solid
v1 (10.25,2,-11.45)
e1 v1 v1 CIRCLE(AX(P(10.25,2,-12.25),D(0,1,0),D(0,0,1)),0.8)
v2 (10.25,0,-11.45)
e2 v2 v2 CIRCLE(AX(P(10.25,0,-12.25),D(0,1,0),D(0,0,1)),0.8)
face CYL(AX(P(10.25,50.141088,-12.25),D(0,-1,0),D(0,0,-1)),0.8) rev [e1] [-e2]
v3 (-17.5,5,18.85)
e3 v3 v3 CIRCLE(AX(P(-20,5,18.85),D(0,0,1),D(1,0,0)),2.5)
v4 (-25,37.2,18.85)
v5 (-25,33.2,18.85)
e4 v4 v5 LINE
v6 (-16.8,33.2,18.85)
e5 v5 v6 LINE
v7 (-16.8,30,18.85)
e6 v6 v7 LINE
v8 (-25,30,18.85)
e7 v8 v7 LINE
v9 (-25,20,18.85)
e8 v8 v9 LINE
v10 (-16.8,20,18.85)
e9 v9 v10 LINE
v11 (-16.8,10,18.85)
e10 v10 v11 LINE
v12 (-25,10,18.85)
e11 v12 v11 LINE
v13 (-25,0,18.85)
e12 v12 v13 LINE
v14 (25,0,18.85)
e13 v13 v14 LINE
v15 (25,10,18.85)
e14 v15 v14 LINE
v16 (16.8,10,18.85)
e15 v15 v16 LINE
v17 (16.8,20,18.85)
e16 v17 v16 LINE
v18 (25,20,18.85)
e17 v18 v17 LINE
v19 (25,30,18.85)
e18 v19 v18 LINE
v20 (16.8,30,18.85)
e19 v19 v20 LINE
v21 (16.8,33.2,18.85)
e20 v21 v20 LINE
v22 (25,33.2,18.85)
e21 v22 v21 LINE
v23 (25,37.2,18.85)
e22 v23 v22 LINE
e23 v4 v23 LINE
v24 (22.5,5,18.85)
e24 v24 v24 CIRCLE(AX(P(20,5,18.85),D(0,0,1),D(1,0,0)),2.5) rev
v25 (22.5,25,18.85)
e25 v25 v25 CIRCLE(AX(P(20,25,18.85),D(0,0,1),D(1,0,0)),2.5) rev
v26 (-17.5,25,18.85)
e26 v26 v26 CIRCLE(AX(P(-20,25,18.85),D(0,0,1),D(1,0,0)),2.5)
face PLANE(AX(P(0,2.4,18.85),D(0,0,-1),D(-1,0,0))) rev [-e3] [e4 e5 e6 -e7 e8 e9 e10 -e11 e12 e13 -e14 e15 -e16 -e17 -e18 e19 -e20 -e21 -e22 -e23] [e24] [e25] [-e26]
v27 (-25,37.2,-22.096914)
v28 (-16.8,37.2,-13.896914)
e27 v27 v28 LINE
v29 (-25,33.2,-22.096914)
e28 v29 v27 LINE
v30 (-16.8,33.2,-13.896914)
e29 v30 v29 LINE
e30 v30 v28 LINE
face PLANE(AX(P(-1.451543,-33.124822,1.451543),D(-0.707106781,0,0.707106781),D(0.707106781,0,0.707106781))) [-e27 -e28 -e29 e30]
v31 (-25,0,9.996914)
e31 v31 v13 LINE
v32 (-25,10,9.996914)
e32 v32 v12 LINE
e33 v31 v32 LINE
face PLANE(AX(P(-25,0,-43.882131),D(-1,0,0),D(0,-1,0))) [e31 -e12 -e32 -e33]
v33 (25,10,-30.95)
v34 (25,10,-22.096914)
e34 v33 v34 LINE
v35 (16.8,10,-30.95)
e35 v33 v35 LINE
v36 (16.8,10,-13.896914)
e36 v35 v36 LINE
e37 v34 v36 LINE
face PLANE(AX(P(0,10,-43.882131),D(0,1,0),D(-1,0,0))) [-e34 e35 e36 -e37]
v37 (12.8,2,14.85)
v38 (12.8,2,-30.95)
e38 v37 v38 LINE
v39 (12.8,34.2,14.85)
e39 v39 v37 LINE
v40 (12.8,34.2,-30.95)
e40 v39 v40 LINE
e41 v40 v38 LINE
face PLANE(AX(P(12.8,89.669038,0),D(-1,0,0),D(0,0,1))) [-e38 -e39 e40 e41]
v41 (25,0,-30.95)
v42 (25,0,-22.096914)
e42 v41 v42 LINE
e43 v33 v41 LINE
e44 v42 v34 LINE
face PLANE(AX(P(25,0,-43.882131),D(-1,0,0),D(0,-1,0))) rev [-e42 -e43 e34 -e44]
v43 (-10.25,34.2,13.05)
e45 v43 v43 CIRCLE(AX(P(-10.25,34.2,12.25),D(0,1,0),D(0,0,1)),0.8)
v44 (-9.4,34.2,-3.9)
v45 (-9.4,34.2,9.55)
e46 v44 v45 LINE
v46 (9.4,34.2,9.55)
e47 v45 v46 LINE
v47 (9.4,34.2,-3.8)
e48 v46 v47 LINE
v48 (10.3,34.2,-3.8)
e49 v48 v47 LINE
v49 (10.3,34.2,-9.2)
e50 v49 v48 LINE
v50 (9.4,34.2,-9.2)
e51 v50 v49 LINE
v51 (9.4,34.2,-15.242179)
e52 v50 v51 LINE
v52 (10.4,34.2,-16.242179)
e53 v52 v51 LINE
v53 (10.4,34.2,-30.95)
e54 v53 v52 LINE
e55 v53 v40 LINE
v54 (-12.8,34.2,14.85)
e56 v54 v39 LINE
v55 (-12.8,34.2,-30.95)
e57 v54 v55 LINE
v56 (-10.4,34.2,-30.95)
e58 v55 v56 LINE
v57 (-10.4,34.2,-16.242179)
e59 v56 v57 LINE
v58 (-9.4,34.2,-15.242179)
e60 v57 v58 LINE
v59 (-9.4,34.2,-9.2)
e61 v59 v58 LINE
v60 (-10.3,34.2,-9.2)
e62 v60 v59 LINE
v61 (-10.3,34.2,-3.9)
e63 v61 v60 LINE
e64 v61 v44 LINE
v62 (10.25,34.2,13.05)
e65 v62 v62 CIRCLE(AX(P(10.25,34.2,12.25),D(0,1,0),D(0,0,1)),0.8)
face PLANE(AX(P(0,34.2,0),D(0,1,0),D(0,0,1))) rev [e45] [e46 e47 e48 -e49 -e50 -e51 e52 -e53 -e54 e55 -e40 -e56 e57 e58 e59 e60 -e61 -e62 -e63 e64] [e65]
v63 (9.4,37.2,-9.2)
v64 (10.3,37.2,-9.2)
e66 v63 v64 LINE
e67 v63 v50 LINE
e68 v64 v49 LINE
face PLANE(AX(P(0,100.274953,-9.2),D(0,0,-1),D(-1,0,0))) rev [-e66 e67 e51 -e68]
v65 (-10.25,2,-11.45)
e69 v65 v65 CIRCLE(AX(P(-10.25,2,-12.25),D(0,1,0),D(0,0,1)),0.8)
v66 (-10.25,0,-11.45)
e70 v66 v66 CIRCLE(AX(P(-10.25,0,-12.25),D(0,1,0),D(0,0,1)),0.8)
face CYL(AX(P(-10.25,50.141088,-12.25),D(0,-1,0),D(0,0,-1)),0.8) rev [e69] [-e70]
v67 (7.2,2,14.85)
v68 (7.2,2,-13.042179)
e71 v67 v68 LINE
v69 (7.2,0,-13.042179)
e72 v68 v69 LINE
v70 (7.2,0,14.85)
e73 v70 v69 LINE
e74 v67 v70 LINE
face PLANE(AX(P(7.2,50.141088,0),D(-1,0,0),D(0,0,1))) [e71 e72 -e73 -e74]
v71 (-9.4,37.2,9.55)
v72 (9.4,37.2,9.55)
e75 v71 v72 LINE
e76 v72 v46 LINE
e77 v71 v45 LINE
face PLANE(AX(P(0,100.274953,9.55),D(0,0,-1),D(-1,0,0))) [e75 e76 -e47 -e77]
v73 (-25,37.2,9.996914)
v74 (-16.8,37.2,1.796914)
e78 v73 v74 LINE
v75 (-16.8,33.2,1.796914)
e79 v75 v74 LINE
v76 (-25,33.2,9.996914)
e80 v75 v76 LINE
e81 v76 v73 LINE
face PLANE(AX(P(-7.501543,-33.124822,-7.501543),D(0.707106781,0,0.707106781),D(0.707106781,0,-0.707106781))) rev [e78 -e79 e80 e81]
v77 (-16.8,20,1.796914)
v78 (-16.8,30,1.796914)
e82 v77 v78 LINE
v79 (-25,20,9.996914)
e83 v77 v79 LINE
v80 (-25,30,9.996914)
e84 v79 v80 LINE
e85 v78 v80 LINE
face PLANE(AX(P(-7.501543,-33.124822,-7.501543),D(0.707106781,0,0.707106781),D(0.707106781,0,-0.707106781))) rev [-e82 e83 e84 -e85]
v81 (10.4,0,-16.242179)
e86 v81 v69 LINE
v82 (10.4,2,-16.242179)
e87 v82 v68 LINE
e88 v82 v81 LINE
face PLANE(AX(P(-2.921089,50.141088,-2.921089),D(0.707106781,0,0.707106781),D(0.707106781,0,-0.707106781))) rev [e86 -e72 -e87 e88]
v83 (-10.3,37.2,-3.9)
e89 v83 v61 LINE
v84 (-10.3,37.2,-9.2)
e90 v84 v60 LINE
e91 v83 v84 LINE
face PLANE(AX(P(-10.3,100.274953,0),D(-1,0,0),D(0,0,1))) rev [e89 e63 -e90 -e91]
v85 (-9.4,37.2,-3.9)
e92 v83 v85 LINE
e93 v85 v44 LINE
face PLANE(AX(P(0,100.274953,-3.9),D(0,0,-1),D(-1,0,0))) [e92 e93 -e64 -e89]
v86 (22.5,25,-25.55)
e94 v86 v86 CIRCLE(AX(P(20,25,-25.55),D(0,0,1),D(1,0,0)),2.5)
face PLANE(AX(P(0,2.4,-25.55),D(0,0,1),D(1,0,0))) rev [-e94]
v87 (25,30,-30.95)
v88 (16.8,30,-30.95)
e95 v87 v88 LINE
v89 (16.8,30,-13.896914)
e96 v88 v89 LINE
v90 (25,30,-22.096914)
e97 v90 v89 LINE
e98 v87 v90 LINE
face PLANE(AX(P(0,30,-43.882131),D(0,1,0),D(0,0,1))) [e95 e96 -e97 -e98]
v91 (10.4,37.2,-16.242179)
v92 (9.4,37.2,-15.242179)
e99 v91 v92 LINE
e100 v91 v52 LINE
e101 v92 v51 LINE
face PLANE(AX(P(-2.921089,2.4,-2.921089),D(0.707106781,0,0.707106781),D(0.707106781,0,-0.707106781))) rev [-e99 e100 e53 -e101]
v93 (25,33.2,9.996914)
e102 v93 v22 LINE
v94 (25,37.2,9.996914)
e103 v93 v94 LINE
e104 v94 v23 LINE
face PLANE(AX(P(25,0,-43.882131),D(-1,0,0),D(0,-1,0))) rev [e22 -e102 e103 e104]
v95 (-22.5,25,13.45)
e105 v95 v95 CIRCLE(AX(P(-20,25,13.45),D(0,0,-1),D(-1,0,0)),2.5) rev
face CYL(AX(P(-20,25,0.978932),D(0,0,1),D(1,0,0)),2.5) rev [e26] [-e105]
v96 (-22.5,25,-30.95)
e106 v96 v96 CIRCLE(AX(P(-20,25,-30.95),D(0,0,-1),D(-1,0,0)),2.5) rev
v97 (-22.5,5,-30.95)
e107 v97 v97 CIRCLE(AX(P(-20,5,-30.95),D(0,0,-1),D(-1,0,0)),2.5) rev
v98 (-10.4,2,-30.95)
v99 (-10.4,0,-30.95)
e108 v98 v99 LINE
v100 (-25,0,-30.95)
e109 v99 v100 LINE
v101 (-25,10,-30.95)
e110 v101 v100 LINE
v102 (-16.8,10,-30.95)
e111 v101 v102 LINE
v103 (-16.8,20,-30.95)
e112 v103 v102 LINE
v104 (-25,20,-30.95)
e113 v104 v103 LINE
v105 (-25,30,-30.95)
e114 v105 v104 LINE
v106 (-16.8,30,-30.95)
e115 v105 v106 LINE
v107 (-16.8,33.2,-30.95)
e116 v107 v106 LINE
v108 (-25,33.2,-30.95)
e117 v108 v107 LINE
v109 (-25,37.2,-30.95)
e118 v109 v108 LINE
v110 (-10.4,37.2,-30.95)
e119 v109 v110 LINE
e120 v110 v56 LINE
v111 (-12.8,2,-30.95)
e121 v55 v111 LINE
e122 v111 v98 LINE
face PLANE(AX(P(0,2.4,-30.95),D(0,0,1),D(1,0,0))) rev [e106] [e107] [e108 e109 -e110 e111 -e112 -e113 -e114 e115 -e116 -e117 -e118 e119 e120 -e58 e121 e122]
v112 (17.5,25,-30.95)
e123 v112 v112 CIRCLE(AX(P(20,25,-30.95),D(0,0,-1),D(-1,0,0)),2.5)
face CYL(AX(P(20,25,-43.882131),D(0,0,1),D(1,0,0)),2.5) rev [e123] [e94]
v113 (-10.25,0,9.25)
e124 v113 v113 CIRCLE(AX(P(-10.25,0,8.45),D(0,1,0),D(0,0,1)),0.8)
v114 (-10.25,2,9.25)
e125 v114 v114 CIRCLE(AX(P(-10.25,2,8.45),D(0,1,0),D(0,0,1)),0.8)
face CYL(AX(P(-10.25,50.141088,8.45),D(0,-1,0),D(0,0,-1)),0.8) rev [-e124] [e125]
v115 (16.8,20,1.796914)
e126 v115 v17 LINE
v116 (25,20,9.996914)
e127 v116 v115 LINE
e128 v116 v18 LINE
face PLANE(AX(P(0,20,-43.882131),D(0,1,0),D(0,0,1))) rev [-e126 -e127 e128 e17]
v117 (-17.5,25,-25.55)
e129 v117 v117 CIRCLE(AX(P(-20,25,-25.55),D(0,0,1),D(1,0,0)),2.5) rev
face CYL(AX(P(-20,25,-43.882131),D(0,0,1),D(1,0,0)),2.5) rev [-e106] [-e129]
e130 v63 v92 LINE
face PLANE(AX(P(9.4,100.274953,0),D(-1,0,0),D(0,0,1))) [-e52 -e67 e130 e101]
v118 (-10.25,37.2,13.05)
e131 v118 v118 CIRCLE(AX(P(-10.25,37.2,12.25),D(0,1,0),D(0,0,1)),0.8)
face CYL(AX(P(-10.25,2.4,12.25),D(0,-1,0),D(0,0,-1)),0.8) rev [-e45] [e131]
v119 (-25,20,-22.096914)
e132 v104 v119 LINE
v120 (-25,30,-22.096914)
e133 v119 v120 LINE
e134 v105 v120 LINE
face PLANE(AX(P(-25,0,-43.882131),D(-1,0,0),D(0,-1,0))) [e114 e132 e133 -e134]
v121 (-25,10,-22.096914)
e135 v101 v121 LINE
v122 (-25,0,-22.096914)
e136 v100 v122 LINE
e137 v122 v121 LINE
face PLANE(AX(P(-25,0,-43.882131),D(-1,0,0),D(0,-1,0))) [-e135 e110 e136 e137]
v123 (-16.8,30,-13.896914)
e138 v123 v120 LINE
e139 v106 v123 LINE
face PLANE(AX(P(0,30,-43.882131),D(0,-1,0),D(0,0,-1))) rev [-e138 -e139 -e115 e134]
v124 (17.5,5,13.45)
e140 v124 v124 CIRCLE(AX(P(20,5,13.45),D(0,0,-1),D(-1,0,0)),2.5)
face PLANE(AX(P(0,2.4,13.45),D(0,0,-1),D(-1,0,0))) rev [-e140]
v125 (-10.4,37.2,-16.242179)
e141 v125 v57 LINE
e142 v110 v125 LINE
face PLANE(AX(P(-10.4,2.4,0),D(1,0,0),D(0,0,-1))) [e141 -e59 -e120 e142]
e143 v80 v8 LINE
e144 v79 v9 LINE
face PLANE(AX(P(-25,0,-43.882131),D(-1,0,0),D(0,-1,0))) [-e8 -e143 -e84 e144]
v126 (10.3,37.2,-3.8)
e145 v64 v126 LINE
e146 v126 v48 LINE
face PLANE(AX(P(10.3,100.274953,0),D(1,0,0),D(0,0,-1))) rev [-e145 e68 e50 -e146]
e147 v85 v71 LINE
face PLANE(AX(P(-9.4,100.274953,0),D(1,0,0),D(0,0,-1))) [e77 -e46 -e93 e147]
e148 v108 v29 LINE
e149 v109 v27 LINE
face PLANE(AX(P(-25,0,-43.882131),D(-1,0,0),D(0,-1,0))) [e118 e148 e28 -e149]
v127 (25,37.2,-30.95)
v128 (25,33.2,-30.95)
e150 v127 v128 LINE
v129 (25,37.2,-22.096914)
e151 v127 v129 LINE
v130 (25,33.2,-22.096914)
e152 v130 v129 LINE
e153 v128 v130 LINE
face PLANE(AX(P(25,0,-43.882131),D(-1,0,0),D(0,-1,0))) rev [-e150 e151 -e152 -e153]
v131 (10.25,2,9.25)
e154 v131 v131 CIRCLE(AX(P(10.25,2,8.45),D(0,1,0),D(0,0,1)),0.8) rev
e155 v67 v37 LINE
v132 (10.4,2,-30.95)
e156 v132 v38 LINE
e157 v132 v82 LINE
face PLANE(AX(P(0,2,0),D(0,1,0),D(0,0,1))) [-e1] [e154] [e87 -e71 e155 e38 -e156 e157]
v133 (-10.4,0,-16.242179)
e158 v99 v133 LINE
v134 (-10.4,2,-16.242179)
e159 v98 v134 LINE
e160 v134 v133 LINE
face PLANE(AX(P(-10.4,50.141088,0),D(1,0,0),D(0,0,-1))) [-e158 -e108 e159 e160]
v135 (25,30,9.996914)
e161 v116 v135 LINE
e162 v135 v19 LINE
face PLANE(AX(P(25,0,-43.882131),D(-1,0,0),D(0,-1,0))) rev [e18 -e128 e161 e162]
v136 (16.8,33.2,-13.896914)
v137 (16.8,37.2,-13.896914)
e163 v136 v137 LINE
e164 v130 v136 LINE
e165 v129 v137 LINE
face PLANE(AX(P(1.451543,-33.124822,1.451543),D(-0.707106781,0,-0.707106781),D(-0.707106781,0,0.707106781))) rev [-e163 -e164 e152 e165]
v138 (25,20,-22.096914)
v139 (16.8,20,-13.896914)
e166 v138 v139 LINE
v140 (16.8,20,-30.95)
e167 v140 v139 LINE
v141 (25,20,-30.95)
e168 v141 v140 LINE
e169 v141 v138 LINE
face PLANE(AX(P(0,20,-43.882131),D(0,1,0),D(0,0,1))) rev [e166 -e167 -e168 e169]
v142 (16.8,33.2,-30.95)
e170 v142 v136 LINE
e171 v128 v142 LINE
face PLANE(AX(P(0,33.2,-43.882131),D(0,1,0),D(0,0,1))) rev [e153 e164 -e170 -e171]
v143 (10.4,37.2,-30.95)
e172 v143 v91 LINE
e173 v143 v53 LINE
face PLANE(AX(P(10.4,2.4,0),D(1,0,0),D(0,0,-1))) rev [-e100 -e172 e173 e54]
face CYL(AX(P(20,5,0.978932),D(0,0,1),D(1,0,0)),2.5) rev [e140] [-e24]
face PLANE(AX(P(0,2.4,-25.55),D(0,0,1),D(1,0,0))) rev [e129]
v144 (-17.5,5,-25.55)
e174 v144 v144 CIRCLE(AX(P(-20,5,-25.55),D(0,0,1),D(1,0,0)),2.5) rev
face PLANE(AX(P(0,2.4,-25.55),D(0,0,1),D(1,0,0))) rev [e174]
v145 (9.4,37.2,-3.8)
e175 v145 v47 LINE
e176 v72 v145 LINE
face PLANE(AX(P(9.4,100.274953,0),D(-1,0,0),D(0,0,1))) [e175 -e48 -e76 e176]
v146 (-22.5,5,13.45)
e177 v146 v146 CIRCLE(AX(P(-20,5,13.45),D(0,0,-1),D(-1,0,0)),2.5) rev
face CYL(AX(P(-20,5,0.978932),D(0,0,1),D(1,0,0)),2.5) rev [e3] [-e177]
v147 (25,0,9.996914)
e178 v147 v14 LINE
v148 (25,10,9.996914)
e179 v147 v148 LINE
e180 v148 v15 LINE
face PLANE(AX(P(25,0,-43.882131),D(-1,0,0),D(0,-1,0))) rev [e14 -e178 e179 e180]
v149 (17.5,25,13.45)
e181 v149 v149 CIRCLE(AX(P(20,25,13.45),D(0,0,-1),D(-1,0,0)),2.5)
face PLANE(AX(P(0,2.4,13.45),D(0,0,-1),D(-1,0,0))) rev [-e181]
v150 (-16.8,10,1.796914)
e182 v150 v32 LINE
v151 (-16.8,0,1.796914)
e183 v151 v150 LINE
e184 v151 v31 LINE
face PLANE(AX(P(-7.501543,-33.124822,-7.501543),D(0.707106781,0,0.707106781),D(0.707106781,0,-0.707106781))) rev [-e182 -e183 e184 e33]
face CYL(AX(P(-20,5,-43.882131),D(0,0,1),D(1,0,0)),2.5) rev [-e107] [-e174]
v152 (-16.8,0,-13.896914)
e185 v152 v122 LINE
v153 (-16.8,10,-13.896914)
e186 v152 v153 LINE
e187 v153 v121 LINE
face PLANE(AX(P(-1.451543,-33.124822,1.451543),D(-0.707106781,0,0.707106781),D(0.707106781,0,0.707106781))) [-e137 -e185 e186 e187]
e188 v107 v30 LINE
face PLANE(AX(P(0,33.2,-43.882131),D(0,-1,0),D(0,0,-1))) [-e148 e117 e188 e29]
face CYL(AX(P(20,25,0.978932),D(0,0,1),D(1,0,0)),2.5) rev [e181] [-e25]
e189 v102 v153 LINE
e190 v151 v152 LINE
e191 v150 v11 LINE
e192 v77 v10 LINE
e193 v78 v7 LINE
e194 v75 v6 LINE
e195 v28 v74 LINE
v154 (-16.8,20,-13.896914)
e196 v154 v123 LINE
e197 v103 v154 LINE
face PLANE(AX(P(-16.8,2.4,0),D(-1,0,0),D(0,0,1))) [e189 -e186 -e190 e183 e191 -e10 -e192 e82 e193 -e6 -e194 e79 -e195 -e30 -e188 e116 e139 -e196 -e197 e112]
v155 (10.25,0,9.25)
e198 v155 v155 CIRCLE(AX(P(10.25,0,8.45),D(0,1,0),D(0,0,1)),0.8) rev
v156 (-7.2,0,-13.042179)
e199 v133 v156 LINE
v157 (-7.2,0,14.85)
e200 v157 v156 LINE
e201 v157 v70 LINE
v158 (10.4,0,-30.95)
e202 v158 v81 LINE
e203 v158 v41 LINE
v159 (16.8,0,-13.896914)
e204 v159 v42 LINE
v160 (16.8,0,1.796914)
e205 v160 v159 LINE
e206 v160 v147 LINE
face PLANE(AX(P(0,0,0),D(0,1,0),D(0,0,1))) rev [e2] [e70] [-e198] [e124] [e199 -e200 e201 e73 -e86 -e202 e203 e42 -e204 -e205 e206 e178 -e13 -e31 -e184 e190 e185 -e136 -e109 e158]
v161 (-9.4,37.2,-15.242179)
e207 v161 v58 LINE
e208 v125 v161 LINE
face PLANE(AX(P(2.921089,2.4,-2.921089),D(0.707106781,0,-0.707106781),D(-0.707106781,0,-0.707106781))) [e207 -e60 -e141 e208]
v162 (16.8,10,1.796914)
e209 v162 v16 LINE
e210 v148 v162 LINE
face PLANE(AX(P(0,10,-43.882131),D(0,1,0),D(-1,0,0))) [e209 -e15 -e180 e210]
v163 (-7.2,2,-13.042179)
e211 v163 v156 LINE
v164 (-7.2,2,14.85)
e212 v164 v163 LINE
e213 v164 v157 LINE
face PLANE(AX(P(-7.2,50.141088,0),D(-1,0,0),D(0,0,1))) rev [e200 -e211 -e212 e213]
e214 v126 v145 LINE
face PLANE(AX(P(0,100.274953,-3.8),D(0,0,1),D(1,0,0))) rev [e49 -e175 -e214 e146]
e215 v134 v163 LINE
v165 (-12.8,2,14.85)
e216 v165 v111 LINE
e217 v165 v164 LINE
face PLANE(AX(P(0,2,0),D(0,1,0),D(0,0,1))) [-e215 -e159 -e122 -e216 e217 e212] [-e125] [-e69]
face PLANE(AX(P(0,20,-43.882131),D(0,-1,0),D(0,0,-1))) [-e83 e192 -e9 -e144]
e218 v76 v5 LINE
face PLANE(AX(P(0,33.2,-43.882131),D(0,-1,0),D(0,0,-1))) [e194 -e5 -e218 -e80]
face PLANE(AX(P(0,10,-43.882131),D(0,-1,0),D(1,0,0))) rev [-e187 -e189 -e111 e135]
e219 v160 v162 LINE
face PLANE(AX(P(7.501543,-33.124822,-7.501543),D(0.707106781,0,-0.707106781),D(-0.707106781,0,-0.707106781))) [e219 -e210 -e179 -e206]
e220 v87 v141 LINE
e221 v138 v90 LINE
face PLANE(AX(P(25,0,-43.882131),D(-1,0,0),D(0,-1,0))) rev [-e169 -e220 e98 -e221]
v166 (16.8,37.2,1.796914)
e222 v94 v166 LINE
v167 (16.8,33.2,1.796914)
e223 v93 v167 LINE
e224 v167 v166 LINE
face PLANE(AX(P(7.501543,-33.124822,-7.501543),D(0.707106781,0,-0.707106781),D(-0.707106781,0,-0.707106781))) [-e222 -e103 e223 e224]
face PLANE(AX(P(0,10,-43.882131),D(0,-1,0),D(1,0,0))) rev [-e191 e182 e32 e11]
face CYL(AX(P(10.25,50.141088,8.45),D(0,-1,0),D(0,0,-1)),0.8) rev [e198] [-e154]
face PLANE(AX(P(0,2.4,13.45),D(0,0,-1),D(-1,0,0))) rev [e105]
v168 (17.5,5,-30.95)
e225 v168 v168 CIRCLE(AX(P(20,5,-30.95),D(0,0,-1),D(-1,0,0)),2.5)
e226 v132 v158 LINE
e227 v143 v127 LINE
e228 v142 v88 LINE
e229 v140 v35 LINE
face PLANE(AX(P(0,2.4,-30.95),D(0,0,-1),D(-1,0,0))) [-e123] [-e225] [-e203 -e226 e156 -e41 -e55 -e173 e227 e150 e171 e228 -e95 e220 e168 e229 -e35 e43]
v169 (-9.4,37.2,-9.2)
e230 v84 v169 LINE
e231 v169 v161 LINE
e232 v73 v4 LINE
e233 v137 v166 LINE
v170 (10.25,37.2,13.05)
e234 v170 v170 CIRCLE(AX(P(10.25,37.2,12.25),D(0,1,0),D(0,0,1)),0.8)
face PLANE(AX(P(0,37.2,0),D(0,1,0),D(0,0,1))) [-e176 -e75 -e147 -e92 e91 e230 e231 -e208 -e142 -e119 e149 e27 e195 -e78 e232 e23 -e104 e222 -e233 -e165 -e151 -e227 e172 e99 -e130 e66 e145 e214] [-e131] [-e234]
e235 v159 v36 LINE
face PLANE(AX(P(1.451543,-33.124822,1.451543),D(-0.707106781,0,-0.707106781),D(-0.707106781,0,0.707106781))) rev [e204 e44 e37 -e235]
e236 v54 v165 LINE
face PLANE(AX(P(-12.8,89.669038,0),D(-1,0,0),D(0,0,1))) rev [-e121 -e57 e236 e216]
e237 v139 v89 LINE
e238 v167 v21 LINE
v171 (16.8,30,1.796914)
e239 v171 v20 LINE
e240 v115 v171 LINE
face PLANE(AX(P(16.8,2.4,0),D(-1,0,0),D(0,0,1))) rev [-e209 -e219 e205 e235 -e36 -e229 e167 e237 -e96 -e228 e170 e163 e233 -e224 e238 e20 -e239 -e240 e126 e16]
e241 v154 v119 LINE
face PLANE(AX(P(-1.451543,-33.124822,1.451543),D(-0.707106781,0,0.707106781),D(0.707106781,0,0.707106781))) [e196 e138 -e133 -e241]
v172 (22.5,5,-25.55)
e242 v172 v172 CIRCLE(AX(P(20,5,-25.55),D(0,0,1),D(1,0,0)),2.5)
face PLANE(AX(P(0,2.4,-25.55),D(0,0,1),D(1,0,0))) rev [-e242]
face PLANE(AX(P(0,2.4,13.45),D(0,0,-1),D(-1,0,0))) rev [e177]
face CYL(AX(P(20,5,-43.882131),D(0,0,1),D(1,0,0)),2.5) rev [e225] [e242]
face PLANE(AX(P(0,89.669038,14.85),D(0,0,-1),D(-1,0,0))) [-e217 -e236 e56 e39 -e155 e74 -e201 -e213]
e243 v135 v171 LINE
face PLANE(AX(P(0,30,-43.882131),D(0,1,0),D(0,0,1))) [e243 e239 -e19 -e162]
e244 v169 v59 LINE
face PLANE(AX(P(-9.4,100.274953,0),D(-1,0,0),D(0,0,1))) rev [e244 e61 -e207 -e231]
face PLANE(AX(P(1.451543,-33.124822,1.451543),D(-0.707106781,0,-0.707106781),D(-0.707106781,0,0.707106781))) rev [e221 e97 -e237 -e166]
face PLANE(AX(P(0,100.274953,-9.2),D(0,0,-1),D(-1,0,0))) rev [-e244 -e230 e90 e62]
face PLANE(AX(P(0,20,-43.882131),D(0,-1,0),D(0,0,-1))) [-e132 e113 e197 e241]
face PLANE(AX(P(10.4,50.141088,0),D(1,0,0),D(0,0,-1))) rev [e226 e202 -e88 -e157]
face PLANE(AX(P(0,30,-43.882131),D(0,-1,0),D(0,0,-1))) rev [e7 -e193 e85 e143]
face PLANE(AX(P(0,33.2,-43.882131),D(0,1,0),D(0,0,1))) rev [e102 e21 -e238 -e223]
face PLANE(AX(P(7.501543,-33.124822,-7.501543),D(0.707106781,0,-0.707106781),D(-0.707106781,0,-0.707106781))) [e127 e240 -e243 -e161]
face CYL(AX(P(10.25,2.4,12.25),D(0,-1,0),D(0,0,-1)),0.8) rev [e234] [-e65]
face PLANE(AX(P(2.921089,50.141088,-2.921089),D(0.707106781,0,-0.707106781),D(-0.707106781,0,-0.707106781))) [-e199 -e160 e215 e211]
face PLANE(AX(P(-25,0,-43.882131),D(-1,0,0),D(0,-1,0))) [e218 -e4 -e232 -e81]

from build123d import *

# Parameters (mm, degrees)
SKETCH1_R                 = 0.8
BOSS_EXTRUDE2_DEPTH       = 2.4
BOSS_EXTRUDE4_DEPTH       = 34.2
BOSS_EXTRUDE7_OUTLINE_R   = 0.8
BOSS_EXTRUDE7_DEPTH       = 37.2
SKETCH1_10_R              = 0.8
CUT_EXTRUDE6_DEPTH        = 34.2
SKETCH1_11_R              = 0.8
BOSS_EXTRUDE8_DEPTH       = 2
BOSS_EXTRUDE9_START       = -49.8
BOSS_EXTRUDE9_OUTLINE_W   = 8.2
BOSS_EXTRUDE9_OUTLINE_H   = 10
BOSS_EXTRUDE9_OUTLINE_R   = 2.5
BOSS_EXTRUDE9_OUTLINE_H_2 = 4
BOSS_EXTRUDE9_DEPTH       = 49.8
BOSS_EXTRUDE10_START      = -44.4
SKETCH9_3_R               = 2.5
BOSS_EXTRUDE10_DEPTH      = 44.4
CUT_EXTRUDE7_START        = -5.4
SKETCH9_4_R               = 2.5
CUT_EXTRUDE7_DEPTH        = 5.4
CUT_EXTRUDE8_START        = -37.2
CUT_EXTRUDE8_DEPTH        = 37.2
BOSS_EXTRUDE12_START      = -3
BOSS_EXTRUDE12_DEPTH      = 3


# Read off the part's stored shape, not the designer's step: Boss-Extrude7, Boss-Extrude9
with BuildPart() as part:
    # Sketch1 → Boss-Extrude2 (new body)
    with BuildSketch(Plane(origin=(0, 0, 0), x_dir=(1, 0, 0), z_dir=(0, 1, 0))):
        Polygon((-10.4, 16.242178951), (-10.4, 30.95), (-16.8, 30.95), (-16.8, -18.85), (16.8, -18.85), (16.8, 30.95), (10.4, 30.95), (10.4, 16.242178951), (7.2, 13.042178951), (7.2, -14.85), (-7.2, -14.85), (-7.2, 13.042178951), align=None)
        with Locations(Location((-10.25, -8.45, 0), (0, 0, 270))):
            Circle(SKETCH1_R, mode=Mode.SUBTRACT)
        with Locations(Location((-10.25, 12.25, 0), (0, 0, 270))):
            Circle(SKETCH1_R, mode=Mode.SUBTRACT)
        with Locations(Location((-10.25, -12.25, 0), (0, 0, 270))):
            Circle(SKETCH1_R, mode=Mode.SUBTRACT)
        with Locations(Location((10.25, -8.45, 0), (0, 0, 270))):
            Circle(SKETCH1_R, mode=Mode.SUBTRACT)
        with Locations(Location((10.25, -12.25, 0), (0, 0, 270))):
            Circle(SKETCH1_R, mode=Mode.SUBTRACT)
        with Locations(Location((10.25, 12.25, 0), (0, 0, 270))):
            Circle(SKETCH1_R, mode=Mode.SUBTRACT)
    extrude(amount=BOSS_EXTRUDE2_DEPTH)

    # Sketch1<6> → Boss-Extrude4 (add)
    with BuildSketch(Plane(origin=(0, 0, 0), x_dir=(1, 0, 0), z_dir=(0, 1, 0))):
        Polygon((-12.8, -14.85), (-12.8, 30.95), (-16.8, 30.95), (-16.8, -18.85), (16.8, -18.85), (16.8, 30.95), (12.8, 30.95), (12.8, -14.85), align=None)
    extrude(amount=BOSS_EXTRUDE4_DEPTH)

    # Boss-Extrude7 outline → Boss-Extrude7 (add)
    with BuildSketch(Plane(origin=(0, 0, 0), x_dir=(1, 0, 0), z_dir=(0, 1, 0))):
        Polygon((16.8, -18.85), (16.8, 30.95), (10.4, 30.95), (10.4, 16.242178951), (9.4, 15.242178951), (9.4, 9.2), (10.3, 9.2), (10.3, 3.8), (9.4, 3.8), (9.4, -9.55), (-9.4, -9.55), (-9.4, 3.9), (-10.3, 3.9), (-10.3, 9.2), (-9.4, 9.2), (-9.4, 15.242178951), (-10.4, 16.242178951), (-10.4, 30.95), (-16.8, 30.95), (-16.8, -18.85), align=None)
        with Locations((-10.25, 12.25)):
            Circle(BOSS_EXTRUDE7_OUTLINE_R, mode=Mode.SUBTRACT)
        with Locations((-10.25, -12.25)):
            Circle(BOSS_EXTRUDE7_OUTLINE_R, mode=Mode.SUBTRACT)
        with Locations((10.25, 12.25)):
            Circle(BOSS_EXTRUDE7_OUTLINE_R, mode=Mode.SUBTRACT)
        with Locations((10.25, -12.25)):
            Circle(BOSS_EXTRUDE7_OUTLINE_R, mode=Mode.SUBTRACT)
    extrude(amount=BOSS_EXTRUDE7_DEPTH)

    # Sketch1<10> → Cut-Extrude6 (cut)
    with BuildSketch(Plane(origin=(0, 0, 0), x_dir=(1, 0, 0), z_dir=(0, 1, 0))):
        Polygon((-10.4, 16.242178951), (-10.4, 30.95), (-12.8, 30.95), (-12.8, -14.85), (12.8, -14.85), (12.8, 30.95), (10.4, 30.95), (10.4, 16.242178951), (7.2, 13.042178951), (7.2, -9.55), (-7.2, -9.55), (-7.2, 13.042178951), align=None)
        with Locations(Location((-10.25, 12.25, 0), (0, 0, 270))):
            Circle(SKETCH1_10_R, mode=Mode.SUBTRACT)
        with Locations(Location((-10.25, -12.25, 0), (0, 0, 270))):
            Circle(SKETCH1_10_R, mode=Mode.SUBTRACT)
        with Locations(Location((10.25, -12.25, 0), (0, 0, 270))):
            Circle(SKETCH1_10_R, mode=Mode.SUBTRACT)
        with Locations(Location((10.25, 12.25, 0), (0, 0, 270))):
            Circle(SKETCH1_10_R, mode=Mode.SUBTRACT)
    extrude(amount=CUT_EXTRUDE6_DEPTH, mode=Mode.SUBTRACT)

    # Sketch1<11> → Boss-Extrude8 (add)
    # profile 1 of 2: a face of its own
    with BuildSketch(Plane(origin=(0, 0, 0), x_dir=(1, 0, 0), z_dir=(0, 1, 0))):
        Polygon((-10.4, 16.242178951), (-10.4, 30.95), (-12.8, 30.95), (-12.8, -14.85), (-7.2, -14.85), (-7.2, 13.042178951), align=None)
        with Locations(Location((-10.25, -8.45, 0), (0, 0, 270))):
            Circle(SKETCH1_11_R, mode=Mode.SUBTRACT)
        with Locations(Location((-10.25, 12.25, 0), (0, 0, 270))):
            Circle(SKETCH1_11_R, mode=Mode.SUBTRACT)
    # profile 2 of 2: a face of its own
    with BuildSketch(Plane(origin=(0, 0, 0), x_dir=(1, 0, 0), z_dir=(0, 1, 0))):
        Polygon((7.2, -14.85), (12.8, -14.85), (12.8, 30.95), (10.4, 30.95), (10.4, 16.242178951), (7.2, 13.042178951), align=None)
        with Locations(Location((10.25, -8.45, 0), (0, 0, 270))):
            Circle(SKETCH1_11_R, mode=Mode.SUBTRACT)
        with Locations(Location((10.25, 12.25, 0), (0, 0, 270))):
            Circle(SKETCH1_11_R, mode=Mode.SUBTRACT)
    extrude(amount=BOSS_EXTRUDE8_DEPTH)

    # Boss-Extrude9 outline → Boss-Extrude9 (add)
    # profile 1 of 6: a face of its own
    with BuildSketch(Plane.XY.offset(18.85).offset(BOSS_EXTRUDE9_START)):
        with Locations((20.9, 5)):
            Rectangle(BOSS_EXTRUDE9_OUTLINE_W, BOSS_EXTRUDE9_OUTLINE_H)
        with Locations((20, 5)):
            Circle(BOSS_EXTRUDE9_OUTLINE_R, mode=Mode.SUBTRACT)
    # profile 2 of 6: a face of its own
    with BuildSketch(Plane.XY.offset(18.85).offset(BOSS_EXTRUDE9_START)):
        with Locations((-20.9, 5)):
            Rectangle(BOSS_EXTRUDE9_OUTLINE_W, BOSS_EXTRUDE9_OUTLINE_H)
        with Locations((-20, 5)):
            Circle(BOSS_EXTRUDE9_OUTLINE_R, mode=Mode.SUBTRACT)
    # profile 3 of 6: a face of its own
    with BuildSketch(Plane.XY.offset(18.85).offset(BOSS_EXTRUDE9_START)):
        with Locations((20.9, 25)):
            Rectangle(BOSS_EXTRUDE9_OUTLINE_W, BOSS_EXTRUDE9_OUTLINE_H)
        with Locations((20, 25)):
            Circle(BOSS_EXTRUDE9_OUTLINE_R, mode=Mode.SUBTRACT)
    # profile 4 of 6: a face of its own
    with BuildSketch(Plane.XY.offset(18.85).offset(BOSS_EXTRUDE9_START)):
        with Locations((-20.9, 25)):
            Rectangle(BOSS_EXTRUDE9_OUTLINE_W, BOSS_EXTRUDE9_OUTLINE_H)
        with Locations((-20, 25)):
            Circle(BOSS_EXTRUDE9_OUTLINE_R, mode=Mode.SUBTRACT)
    # profile 5 of 6: a face of its own
    with BuildSketch(Plane.XY.offset(18.85).offset(BOSS_EXTRUDE9_START)):
        with Locations((20.9, 35.2)):
            Rectangle(BOSS_EXTRUDE9_OUTLINE_W, BOSS_EXTRUDE9_OUTLINE_H_2)
    # profile 6 of 6: a face of its own
    with BuildSketch(Plane.XY.offset(18.85).offset(BOSS_EXTRUDE9_START)):
        with Locations((-20.9, 35.2)):
            Rectangle(BOSS_EXTRUDE9_OUTLINE_W, BOSS_EXTRUDE9_OUTLINE_H_2)
    extrude(amount=BOSS_EXTRUDE9_DEPTH)

    # Sketch9<3> → Boss-Extrude10 (add)
    with BuildSketch(Plane.XY.offset(18.85).offset(BOSS_EXTRUDE10_START)):
        with Locations((-20, 25)):
            Circle(SKETCH9_3_R)
        with Locations((-20, 5)):
            Circle(SKETCH9_3_R)
        with Locations((20, 5)):
            Circle(SKETCH9_3_R)
        with Locations((20, 25)):
            Circle(SKETCH9_3_R)
    extrude(amount=BOSS_EXTRUDE10_DEPTH)

    # Sketch9<4> → Cut-Extrude7 (cut)
    with BuildSketch(Plane.XY.offset(18.85).offset(CUT_EXTRUDE7_START)):
        with Locations((-20, 25)):
            Circle(SKETCH9_4_R)
        with Locations((-20, 5)):
            Circle(SKETCH9_4_R)
        with Locations((20, 5)):
            Circle(SKETCH9_4_R)
        with Locations((20, 25)):
            Circle(SKETCH9_4_R)
    extrude(amount=CUT_EXTRUDE7_DEPTH, mode=Mode.SUBTRACT)

    # Sketch12 → Cut-Extrude8 (cut)
    with BuildSketch(Plane(origin=(0, 37.2, 0), x_dir=(1, 0, 0), z_dir=(0, 1, 0)).offset(CUT_EXTRUDE8_START)):
        Polygon((-16.8, 13.896914247), (-25, 22.096914247), (-25, -9.996914247), (-16.8, -1.796914247), align=None)
        Polygon((16.8, -1.796914247), (25, -9.996914247), (25, 22.096914247), (16.8, 13.896914247), align=None)
    extrude(amount=CUT_EXTRUDE8_DEPTH, mode=Mode.SUBTRACT)

    # Sketch14 → Boss-Extrude12 (add)
    with BuildSketch(Plane(origin=(0, 37.2, 0), x_dir=(1, 0, 0), z_dir=(0, 1, 0)).offset(BOSS_EXTRUDE12_START)):
        with BuildLine():
            ThreePointArc((-10.3, 13.048435971), (-11.05, 12.25), (-10.3, 11.451564029))
            Line((-10.3, 11.451564029), (-10.3, 13.048435971))
        make_face()
        with BuildLine():
            Line((-10.3, 13.048435971), (-10.3, 11.451564029))
            ThreePointArc((-10.3, 11.451564029), (-9.702277442, 11.666904811), (-9.45, 12.25))
            ThreePointArc((-9.45, 12.25), (-9.702277442, 12.833095189), (-10.3, 13.048435971))
        make_face()
        with BuildLine():
            ThreePointArc((10.3, 13.048435971), (9.45, 12.25), (10.3, 11.451564029))
            Line((10.3, 11.451564029), (10.3, 13.048435971))
        make_face()
        with BuildLine():
            Line((10.3, 13.048435971), (10.3, 11.451564029))
            ThreePointArc((10.3, 11.451564029), (10.833095189, 11.702277442), (11.05, 12.25))
            ThreePointArc((11.05, 12.25), (10.833095189, 12.797722558), (10.3, 13.048435971))
        make_face()
    extrude(amount=BOSS_EXTRUDE12_DEPTH)


solid = part.part
